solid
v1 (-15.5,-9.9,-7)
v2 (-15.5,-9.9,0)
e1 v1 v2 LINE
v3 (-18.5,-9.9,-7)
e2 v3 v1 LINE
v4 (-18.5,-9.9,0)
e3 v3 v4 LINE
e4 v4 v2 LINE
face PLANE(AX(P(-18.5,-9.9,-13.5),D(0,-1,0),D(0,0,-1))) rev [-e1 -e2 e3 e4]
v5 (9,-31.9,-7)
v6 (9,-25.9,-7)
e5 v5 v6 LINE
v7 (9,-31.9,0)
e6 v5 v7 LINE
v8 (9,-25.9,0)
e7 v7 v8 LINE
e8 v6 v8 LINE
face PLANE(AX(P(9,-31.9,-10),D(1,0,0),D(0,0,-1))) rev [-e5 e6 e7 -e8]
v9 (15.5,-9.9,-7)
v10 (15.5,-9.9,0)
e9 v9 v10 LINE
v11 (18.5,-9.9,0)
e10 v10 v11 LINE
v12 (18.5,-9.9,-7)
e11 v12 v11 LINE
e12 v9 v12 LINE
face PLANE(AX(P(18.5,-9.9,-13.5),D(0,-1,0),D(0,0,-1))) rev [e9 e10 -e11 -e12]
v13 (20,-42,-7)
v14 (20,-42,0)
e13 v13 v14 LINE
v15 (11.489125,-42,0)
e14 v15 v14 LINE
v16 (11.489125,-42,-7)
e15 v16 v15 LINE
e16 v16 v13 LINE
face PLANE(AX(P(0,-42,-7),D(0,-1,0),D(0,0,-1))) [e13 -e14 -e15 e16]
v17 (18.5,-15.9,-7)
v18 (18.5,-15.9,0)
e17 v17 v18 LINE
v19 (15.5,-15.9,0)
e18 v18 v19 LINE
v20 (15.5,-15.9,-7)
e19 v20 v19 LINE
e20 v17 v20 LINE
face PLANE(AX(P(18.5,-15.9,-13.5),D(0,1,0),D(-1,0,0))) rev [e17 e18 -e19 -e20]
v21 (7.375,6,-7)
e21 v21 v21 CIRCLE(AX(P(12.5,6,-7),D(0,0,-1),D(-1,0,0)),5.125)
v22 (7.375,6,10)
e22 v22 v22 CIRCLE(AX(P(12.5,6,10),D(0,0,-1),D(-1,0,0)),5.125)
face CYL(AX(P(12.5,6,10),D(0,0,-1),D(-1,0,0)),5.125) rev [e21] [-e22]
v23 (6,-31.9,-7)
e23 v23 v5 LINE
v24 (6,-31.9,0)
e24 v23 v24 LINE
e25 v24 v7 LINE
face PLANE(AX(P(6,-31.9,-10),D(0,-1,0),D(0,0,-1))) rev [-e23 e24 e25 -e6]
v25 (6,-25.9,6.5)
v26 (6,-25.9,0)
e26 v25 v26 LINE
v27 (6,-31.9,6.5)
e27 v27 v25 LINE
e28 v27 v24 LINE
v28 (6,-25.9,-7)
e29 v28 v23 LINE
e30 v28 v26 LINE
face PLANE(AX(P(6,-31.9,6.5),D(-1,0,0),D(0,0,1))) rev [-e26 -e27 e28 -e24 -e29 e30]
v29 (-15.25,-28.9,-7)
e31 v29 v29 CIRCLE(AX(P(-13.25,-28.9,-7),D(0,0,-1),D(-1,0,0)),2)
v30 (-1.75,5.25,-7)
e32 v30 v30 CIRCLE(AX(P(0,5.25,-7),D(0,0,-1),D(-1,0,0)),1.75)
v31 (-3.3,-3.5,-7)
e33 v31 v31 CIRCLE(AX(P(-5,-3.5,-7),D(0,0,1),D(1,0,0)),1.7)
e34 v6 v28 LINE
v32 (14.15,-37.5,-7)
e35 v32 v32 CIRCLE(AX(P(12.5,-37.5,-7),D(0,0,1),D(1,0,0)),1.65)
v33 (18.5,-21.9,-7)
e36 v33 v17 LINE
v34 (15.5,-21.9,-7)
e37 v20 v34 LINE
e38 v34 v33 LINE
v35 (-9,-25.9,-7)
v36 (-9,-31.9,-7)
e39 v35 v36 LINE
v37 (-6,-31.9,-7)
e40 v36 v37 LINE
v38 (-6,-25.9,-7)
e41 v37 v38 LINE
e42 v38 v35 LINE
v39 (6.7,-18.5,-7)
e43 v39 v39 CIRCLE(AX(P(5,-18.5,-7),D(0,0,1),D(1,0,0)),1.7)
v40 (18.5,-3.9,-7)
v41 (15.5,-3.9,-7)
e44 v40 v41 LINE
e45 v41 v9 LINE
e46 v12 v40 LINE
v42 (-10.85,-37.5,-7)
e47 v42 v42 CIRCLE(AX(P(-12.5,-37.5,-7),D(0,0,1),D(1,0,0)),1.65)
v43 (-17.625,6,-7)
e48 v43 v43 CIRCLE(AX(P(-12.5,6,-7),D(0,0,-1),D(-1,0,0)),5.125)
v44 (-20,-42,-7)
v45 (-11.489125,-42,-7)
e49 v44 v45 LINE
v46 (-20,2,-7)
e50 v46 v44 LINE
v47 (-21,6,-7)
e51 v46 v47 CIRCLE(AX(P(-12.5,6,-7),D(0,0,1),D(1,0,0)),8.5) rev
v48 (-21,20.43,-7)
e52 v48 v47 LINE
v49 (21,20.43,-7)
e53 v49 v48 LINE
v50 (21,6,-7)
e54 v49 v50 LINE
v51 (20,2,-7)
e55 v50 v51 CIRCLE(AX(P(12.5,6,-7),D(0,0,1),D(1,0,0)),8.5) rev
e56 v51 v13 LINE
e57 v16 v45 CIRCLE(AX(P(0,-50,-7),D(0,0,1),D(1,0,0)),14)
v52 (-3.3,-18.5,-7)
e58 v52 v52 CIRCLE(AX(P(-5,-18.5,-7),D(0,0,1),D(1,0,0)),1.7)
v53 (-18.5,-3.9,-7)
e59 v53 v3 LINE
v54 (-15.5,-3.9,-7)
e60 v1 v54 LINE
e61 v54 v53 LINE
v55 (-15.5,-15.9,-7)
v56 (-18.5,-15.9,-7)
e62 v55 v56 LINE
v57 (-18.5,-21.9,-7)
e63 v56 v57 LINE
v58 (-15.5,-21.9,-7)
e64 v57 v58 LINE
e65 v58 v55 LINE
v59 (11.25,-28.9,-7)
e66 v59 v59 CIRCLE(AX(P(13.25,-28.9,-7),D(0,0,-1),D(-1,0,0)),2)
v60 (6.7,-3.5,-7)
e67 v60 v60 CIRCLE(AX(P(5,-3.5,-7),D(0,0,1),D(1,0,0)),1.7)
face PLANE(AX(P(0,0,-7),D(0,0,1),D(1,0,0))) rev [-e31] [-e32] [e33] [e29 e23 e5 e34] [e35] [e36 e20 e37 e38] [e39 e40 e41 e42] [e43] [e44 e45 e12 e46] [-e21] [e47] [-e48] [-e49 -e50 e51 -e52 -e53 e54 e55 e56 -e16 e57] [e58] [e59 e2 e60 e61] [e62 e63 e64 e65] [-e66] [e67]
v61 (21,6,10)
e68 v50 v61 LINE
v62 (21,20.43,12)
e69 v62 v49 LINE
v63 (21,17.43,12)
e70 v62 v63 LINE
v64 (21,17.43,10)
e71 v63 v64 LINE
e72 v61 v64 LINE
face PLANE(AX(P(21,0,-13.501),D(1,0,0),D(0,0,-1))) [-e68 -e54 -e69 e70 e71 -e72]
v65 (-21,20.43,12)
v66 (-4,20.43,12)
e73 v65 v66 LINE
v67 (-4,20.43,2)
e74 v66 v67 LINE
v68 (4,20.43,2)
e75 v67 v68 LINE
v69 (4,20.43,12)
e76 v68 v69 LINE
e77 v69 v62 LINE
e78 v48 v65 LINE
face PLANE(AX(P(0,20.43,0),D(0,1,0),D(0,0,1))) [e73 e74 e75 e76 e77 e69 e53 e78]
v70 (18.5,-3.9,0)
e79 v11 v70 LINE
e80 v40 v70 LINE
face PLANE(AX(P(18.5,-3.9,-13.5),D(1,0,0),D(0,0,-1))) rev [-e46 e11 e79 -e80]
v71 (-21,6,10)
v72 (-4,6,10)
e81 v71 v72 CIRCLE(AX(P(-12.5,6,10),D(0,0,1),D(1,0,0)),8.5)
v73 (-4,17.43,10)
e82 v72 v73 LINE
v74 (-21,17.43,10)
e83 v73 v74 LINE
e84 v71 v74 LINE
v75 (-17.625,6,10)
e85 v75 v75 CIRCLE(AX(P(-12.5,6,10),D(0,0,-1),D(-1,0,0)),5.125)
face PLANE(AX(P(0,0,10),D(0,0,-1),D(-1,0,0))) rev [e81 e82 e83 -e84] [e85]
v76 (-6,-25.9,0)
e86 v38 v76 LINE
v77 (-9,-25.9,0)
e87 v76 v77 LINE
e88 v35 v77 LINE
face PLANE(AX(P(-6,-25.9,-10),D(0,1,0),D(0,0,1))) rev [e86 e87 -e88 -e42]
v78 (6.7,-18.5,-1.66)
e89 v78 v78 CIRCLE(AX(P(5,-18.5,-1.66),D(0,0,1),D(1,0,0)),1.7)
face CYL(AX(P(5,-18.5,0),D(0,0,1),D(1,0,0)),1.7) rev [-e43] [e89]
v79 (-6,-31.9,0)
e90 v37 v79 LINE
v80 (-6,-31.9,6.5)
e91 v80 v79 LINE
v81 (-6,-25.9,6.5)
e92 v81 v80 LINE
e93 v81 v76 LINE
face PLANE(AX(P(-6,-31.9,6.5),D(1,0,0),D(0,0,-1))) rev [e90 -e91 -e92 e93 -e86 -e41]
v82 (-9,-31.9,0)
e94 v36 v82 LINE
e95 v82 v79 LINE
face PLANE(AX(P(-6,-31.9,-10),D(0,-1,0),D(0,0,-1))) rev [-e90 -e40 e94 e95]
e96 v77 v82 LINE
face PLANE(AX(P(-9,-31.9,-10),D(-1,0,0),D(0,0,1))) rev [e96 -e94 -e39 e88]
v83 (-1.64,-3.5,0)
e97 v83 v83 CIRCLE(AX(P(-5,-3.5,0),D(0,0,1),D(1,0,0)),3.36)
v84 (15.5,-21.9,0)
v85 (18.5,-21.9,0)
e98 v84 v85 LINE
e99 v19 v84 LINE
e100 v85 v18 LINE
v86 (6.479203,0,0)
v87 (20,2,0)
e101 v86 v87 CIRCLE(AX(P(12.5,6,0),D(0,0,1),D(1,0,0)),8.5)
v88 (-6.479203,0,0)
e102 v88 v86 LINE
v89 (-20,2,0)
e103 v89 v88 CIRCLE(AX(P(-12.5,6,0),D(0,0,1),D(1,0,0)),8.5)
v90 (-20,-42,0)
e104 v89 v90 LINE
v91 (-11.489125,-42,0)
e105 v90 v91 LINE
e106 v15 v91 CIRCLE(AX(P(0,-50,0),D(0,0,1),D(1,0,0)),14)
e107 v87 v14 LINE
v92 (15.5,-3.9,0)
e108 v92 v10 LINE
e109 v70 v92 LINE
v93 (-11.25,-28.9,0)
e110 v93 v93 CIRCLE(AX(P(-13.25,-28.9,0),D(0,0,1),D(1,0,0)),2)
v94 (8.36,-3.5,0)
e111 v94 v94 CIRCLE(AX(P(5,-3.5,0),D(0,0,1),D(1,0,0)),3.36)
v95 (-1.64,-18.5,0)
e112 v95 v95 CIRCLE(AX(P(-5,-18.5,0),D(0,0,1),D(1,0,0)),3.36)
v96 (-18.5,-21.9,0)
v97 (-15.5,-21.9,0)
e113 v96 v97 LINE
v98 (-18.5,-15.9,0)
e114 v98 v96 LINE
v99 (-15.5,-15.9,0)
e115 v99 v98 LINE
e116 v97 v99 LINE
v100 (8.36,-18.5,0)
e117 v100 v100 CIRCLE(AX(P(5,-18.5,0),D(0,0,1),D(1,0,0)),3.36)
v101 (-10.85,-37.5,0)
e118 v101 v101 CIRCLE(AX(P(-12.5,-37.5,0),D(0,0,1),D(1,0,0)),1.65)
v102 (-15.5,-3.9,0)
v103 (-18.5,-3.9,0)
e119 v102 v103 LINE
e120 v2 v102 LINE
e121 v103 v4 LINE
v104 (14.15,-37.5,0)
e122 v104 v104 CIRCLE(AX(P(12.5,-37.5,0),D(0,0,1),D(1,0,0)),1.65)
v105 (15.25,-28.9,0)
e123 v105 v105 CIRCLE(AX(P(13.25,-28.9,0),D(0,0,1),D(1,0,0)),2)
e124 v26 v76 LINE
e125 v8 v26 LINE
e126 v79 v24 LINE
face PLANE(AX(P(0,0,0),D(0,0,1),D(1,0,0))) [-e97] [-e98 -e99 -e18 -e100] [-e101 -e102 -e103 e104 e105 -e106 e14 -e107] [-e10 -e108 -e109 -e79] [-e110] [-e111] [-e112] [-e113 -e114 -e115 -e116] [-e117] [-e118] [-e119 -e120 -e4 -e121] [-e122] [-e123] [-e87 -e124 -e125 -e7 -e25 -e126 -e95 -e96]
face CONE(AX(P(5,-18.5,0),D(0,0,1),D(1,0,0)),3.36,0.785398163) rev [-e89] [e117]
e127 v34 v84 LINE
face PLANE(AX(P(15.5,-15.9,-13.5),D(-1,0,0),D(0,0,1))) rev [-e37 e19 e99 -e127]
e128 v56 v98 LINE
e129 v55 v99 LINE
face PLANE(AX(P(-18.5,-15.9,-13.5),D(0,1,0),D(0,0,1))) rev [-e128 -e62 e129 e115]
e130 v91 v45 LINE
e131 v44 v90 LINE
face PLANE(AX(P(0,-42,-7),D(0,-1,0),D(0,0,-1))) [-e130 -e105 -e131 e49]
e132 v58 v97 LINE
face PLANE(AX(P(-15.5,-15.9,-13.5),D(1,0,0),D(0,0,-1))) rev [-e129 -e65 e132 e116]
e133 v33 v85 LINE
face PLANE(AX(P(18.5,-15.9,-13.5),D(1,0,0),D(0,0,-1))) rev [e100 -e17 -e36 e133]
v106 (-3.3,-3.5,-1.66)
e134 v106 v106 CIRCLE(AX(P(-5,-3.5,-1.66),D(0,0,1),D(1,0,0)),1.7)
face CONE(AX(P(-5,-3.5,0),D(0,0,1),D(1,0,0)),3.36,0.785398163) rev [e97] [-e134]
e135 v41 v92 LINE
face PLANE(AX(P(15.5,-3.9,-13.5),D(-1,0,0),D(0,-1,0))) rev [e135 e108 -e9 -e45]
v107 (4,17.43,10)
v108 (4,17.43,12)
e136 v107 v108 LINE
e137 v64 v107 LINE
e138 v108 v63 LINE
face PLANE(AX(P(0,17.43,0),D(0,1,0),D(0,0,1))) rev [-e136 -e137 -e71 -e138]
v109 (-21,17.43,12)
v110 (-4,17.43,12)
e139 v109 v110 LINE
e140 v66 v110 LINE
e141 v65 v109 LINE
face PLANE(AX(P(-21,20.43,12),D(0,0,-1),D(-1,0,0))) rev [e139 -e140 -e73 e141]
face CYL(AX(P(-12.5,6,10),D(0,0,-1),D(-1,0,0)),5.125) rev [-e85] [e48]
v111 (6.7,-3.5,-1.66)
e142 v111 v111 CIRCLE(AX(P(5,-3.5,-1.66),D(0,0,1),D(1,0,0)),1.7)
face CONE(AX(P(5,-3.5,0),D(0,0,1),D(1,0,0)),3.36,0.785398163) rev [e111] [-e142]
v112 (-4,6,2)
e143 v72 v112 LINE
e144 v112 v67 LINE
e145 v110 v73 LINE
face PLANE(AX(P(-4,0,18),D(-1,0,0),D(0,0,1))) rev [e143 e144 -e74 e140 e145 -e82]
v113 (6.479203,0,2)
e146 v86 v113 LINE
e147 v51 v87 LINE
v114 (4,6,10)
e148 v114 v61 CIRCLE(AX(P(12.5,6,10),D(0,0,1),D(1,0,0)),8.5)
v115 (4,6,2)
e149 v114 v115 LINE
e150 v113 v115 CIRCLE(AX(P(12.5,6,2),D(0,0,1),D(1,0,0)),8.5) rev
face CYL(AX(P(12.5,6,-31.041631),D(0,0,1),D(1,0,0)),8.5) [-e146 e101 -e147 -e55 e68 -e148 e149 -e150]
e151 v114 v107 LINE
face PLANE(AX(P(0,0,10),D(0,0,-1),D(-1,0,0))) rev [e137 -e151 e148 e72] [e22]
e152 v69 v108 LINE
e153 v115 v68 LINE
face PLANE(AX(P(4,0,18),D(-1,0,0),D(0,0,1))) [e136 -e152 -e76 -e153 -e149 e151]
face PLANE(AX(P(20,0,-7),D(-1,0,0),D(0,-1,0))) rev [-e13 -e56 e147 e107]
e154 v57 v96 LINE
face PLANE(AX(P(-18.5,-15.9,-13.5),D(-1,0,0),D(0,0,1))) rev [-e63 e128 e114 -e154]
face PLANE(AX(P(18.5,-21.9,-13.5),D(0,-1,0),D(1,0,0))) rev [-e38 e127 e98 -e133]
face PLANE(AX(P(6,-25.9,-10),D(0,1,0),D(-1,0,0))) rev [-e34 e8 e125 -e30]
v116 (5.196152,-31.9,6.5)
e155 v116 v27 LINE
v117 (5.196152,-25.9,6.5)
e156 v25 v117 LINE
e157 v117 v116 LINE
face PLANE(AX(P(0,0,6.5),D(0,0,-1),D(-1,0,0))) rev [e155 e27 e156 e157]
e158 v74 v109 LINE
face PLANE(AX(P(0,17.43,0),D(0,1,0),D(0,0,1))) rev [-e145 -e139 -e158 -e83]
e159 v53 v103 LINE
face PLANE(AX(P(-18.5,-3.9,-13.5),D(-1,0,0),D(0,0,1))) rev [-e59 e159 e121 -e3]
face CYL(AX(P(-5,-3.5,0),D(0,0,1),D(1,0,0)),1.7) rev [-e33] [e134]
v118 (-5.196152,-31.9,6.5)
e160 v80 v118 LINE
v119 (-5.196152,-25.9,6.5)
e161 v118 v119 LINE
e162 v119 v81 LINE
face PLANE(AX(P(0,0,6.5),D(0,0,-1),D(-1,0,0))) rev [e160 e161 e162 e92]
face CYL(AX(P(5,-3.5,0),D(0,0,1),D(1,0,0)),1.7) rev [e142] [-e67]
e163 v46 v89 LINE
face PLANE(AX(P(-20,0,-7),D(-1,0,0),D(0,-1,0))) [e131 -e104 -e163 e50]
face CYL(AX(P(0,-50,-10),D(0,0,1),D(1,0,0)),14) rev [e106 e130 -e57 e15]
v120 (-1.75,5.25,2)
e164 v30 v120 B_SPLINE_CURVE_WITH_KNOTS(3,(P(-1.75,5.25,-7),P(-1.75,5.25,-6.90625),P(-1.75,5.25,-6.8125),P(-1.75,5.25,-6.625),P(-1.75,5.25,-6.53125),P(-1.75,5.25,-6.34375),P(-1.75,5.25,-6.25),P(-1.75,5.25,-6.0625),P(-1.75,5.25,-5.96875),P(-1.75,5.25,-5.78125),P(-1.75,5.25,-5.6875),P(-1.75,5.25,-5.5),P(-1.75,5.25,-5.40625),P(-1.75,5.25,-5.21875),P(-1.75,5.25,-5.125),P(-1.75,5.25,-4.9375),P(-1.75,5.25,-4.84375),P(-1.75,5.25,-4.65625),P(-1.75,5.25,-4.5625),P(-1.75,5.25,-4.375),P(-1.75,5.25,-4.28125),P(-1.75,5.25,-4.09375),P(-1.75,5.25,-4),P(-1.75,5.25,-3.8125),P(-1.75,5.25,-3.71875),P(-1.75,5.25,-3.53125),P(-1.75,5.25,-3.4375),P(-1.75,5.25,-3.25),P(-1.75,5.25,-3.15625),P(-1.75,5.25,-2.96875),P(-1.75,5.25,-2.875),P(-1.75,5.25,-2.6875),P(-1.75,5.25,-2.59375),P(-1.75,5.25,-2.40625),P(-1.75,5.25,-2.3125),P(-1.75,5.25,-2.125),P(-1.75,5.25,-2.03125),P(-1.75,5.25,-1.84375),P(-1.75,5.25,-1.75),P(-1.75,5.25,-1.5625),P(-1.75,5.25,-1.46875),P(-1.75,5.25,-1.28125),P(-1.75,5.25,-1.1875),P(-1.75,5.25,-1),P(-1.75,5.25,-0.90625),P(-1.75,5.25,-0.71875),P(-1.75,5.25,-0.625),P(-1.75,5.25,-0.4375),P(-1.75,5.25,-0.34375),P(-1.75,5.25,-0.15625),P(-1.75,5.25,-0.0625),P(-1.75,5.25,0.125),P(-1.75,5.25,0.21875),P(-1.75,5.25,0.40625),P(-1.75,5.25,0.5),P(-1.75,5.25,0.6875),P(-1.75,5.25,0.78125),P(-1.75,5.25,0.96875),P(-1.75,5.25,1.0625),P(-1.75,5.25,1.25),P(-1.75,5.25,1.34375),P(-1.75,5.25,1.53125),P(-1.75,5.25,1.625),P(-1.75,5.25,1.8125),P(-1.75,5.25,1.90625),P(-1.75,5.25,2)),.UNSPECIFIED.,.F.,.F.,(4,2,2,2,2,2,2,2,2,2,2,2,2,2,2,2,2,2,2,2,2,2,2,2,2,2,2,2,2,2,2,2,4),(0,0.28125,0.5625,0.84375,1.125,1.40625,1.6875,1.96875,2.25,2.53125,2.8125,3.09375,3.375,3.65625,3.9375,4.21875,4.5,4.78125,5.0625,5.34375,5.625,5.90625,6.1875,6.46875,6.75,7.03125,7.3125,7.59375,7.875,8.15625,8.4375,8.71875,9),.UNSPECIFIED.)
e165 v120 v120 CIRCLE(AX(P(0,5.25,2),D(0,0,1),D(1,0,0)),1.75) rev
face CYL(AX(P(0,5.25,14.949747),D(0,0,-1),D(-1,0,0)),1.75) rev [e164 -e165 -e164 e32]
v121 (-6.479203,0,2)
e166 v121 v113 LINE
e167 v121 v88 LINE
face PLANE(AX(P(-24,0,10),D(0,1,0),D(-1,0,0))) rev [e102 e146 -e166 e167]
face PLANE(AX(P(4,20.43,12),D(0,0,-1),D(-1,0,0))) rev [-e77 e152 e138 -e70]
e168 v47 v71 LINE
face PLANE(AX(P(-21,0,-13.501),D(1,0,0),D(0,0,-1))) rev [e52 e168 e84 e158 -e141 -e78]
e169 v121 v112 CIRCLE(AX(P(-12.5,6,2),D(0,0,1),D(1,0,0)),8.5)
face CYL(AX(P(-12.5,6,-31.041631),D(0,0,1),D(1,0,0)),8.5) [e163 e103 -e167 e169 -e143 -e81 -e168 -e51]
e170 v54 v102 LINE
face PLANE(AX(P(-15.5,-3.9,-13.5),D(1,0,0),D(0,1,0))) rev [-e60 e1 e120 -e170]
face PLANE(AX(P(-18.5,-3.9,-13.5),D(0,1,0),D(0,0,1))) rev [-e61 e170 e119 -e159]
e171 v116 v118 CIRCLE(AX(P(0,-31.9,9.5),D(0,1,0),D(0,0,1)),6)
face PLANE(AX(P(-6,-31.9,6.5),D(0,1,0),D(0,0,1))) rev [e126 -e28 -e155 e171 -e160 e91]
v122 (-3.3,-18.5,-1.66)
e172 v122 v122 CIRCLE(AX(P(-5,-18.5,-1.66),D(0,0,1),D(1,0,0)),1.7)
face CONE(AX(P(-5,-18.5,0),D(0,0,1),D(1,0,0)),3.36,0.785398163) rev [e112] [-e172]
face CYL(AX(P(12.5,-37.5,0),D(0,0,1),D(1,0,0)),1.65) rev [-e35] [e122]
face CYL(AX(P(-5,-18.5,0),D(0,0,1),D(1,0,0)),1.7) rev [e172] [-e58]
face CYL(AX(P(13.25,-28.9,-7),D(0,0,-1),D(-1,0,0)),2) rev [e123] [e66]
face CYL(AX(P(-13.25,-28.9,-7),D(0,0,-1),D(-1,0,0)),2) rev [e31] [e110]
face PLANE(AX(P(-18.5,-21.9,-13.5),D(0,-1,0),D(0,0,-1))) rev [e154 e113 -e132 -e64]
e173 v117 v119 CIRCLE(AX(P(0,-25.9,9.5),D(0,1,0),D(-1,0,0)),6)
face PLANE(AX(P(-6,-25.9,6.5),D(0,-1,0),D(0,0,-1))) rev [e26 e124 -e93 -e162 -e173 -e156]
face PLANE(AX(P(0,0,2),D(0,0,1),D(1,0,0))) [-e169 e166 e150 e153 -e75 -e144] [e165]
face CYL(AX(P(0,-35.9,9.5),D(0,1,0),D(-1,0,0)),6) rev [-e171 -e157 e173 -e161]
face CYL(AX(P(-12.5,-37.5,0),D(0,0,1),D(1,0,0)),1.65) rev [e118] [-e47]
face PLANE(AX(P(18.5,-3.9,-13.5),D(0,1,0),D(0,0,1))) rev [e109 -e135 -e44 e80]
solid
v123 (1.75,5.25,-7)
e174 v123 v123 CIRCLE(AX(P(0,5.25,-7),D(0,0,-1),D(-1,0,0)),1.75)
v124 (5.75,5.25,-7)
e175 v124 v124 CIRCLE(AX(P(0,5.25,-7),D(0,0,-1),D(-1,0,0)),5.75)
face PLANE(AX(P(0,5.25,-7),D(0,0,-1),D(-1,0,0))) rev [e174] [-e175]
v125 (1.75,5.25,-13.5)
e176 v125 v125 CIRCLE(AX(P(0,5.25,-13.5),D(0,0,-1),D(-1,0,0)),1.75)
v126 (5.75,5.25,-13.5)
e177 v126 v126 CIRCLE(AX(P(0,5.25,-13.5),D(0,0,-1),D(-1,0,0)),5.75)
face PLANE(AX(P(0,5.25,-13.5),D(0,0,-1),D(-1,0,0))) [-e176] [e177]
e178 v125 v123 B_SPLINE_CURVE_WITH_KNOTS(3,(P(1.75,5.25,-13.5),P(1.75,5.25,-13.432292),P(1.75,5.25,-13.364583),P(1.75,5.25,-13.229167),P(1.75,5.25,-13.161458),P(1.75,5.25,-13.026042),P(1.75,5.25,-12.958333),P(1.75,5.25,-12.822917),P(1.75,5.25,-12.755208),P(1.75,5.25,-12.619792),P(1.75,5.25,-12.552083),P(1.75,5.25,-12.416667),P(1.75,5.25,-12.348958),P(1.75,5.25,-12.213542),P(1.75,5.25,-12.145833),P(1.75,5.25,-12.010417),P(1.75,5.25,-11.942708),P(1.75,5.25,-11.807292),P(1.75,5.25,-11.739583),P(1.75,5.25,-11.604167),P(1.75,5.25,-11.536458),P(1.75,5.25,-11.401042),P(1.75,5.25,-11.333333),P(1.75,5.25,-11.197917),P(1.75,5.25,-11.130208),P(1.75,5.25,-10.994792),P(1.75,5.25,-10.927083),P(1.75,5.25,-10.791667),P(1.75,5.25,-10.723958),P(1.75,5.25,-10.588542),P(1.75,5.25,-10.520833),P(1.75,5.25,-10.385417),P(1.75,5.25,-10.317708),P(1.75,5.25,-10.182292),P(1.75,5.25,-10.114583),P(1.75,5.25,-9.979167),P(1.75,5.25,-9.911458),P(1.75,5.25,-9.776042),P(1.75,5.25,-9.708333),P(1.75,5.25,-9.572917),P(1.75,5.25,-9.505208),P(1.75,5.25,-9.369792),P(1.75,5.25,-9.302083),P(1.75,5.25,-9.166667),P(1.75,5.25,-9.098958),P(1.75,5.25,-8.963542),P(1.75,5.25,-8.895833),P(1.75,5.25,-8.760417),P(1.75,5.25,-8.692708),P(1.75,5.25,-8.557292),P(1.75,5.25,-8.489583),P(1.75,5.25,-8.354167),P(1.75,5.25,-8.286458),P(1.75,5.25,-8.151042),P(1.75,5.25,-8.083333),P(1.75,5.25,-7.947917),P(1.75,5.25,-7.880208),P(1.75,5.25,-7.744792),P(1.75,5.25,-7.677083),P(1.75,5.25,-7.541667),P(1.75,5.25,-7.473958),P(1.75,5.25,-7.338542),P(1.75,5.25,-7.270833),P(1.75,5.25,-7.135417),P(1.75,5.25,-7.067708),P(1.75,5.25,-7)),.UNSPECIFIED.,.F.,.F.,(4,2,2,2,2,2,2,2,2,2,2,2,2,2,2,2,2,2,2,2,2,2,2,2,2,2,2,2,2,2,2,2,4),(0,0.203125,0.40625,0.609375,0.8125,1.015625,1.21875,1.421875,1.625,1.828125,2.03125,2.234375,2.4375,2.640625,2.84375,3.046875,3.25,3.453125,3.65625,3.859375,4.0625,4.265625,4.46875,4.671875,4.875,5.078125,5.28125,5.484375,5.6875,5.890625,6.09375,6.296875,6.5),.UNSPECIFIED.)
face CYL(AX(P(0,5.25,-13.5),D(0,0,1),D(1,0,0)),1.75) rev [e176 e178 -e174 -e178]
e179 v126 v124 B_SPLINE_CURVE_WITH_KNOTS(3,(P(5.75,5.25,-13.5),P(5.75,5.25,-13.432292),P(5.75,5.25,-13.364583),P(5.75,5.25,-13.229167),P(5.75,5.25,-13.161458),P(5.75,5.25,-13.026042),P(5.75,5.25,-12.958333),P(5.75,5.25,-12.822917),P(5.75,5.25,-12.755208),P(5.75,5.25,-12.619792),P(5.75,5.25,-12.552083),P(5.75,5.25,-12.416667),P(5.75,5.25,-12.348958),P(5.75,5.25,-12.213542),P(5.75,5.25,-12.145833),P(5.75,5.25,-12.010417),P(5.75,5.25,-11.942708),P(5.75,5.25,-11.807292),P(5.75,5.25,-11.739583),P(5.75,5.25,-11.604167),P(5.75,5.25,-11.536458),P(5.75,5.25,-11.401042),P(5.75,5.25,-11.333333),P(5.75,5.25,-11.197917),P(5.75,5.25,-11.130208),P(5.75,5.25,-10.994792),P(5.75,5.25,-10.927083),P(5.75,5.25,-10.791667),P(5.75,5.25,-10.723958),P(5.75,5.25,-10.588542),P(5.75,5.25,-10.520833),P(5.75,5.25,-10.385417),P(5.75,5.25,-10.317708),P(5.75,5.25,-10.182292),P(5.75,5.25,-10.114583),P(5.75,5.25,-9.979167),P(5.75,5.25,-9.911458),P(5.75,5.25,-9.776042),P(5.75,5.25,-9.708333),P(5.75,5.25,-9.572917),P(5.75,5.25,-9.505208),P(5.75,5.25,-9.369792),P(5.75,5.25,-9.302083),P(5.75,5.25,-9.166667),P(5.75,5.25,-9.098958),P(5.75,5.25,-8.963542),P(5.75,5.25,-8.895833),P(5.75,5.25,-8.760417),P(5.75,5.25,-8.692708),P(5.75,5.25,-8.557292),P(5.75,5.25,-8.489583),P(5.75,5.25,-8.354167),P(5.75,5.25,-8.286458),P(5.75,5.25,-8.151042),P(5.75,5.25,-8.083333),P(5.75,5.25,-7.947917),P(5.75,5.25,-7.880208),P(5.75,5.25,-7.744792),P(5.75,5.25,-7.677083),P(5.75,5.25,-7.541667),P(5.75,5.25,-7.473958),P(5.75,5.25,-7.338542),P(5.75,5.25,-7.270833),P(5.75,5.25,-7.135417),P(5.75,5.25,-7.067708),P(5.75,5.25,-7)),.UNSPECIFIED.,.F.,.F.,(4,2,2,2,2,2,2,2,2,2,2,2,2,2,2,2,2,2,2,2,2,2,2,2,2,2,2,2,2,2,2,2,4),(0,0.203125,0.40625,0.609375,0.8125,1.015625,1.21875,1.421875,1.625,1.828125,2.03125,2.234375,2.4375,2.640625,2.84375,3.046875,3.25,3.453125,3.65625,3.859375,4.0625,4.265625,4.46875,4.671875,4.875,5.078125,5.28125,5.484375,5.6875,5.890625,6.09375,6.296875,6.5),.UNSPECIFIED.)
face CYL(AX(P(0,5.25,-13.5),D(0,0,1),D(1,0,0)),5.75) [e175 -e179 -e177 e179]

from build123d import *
from build123d.topology import SkipClean

# Parameters (mm, degrees)
SKETCH1_W                         = 30
SKETCH1_H                         = 42
BOSS_EXTRUDE1_DEPTH               = 7
CSK_FOR_M3_SFHCS1_D               = 3.4
CSK_FOR_M3_SFHCS1_CSINK_D         = 6.72
CSK_FOR_M3_SFHCS1_CSINK_ANGLE     = 90
SKETCH4_R                         = 14
CUT_EXTRUDE1_DEPTH                = 10
M4X0_7_TAPPED_HOLE1_D             = 3.3
SKETCH8_W                         = 12
SKETCH8_H                         = 6
BOSS_EXTRUDE2_DEPTH               = 6.5
SKETCH9_R                         = 6
CUT_EXTRUDE2_DEPTH                = 10
SKETCH13_W                        = 3
SKETCH13_H                        = 6
CUT_EXTRUDE4_DEPTH                = 10
BOSS_EXTRUDE5_DEPTH               = 10
BOSS_EXTRUDE5_DEPTH_BACK          = 7
SKETCH14_W                        = 48
SKETCH14_H                        = 17
SKETCH15_R                        = 5.125
CUT_EXTRUDE5_DEPTH                = 52.273774973
BOSS_EXTRUDE6_REACH               = 53.274
SKETCH16_R                        = 8.5
SKETCH16_R_2                      = 5.125
SKETCH18_R                        = 5.75
SKETCH18_R_2                      = 1.75
BOSS_EXTRUDE7_DEPTH               = 6.5
SKETCH19_R                        = 1.75
CUT_EXTRUDE6_DEPTH                = 17
SKETCH20_W                        = 32
SKETCH20_H                        = 3
BOSS_EXTRUDE8_DEPTH               = 3
CUT_EXTRUDE7_DEPTH                = 8
CUT_EXTRUDE7_DEPTH_BACK           = 8
SKETCH22_R                        = 1.75
SKETCH22_W                        = 8
SKETCH22_H                        = 3
SKETCH24_W                        = 2
SKETCH24_H                        = 7.001
F_4_0_4_DIAMETER_HOLE1_AT_2_COUNT = 2
F_4_0_4_DIAMETER_HOLE1_AT_2_PITCH = 26.5
CUT_EXTRUDE8_DEPTH                = 17
MOVE_FACE2_BY                     = 0.43
SKETCH26_W                        = 32
SKETCH26_H                        = 3.43
CUT_EXTRUDE9_DEPTH                = 3
BOSS_EXTRUDE9_DEPTH               = 3
DELETEFACE1_START                 = -7
DELETEFACE1_DEPTH                 = 7
SKETCH28_W                        = 3
SKETCH28_H                        = 6
CUT_EXTRUDE10_DEPTH               = 49.859492425


# Read off the part's stored shape, not the designer's step: DeleteFace1
with BuildPart() as part:
    # Sketch1 → Boss-Extrude1 (new body)
    with BuildSketch(Plane.XY):
        with Locations((0, -21)):
            Rectangle(SKETCH1_W, SKETCH1_H)
        Polygon((-15, -42), (-15, -2), (-20, -7), (-20, -42), align=None)
        Polygon((15, -2), (15, -42), (20, -42), (20, -7), align=None)
    extrude(amount=-BOSS_EXTRUDE1_DEPTH)

    # CSK for M3 SFHCS1 (through all)
    with Locations(Plane.XY):
        with Locations((-5, -3.5), (5, -3.5), (-5, -18.5), (5, -18.5)):
            CounterSinkHole(CSK_FOR_M3_SFHCS1_D / 2, CSK_FOR_M3_SFHCS1_CSINK_D / 2, counter_sink_angle=CSK_FOR_M3_SFHCS1_CSINK_ANGLE)

    # Sketch4 → Cut-Extrude1 (cut)
    with BuildSketch(Plane.XY):
        with Locations((0, -50)):
            Circle(SKETCH4_R)
    extrude(amount=-CUT_EXTRUDE1_DEPTH, mode=Mode.SUBTRACT)

    # M4x0.7 Tapped Hole1 (through all)
    with Locations(Plane.XY):
        with Locations((-12.5, -37.5), (12.5, -37.5)):
            Hole(M4X0_7_TAPPED_HOLE1_D / 2)

    # Sketch8 → Boss-Extrude2 (add)
    with BuildSketch(Plane.XY):
        with Locations((0, -28.9)):
            Rectangle(SKETCH8_W, SKETCH8_H)
    extrude(amount=BOSS_EXTRUDE2_DEPTH)

    # Sketch9 → Cut-Extrude2 (cut)
    with BuildSketch(Plane(origin=(0, -25.9, 0), x_dir=(1, 0, 0), z_dir=(0, 1, 0))):
        with Locations((0, -9.5)):
            Circle(SKETCH9_R)
    extrude(amount=-CUT_EXTRUDE2_DEPTH, mode=Mode.SUBTRACT)

    # Sketch13 → Cut-Extrude4 (cut)
    with BuildSketch(Plane.XY):
        with Locations((-7.5, -28.9)):
            Rectangle(SKETCH13_W, SKETCH13_H)
        with Locations((7.5, -28.9)):
            Rectangle(SKETCH13_W, SKETCH13_H)
    extrude(amount=-CUT_EXTRUDE4_DEPTH, mode=Mode.SUBTRACT)

    # Sketch14 → Boss-Extrude5 (add, two sides: drawn at the far end of the back side and taken through both)
    with BuildSketch(Plane.XY.offset(-BOSS_EXTRUDE5_DEPTH_BACK)):
        with Locations((0, 8.5)):
            Rectangle(SKETCH14_W, SKETCH14_H)
    extrude(amount=BOSS_EXTRUDE5_DEPTH + BOSS_EXTRUDE5_DEPTH_BACK)

    # Sketch15 → Cut-Extrude5 (cut, through all)
    with BuildSketch(Plane(origin=(0, 0, -7), x_dir=(-1, 0, 0), z_dir=(0, 0, -1))):
        with Locations((12.5, 6)):
            Circle(SKETCH15_R)
        with Locations((-12.5, 6)):
            Circle(SKETCH15_R)
    extrude(amount=-CUT_EXTRUDE5_DEPTH, mode=Mode.SUBTRACT)

    # Boss-Extrude6: up to this face of the body (flat: up to its plane)
    boss_extrude6_end = Plane(part.part.faces().sort_by_distance((0, -11.103380249, -7))[0])
    # Sketch16 → Boss-Extrude6 (add, up to the picked face)
    with BuildSketch(Plane.XY.offset(10), mode=Mode.PRIVATE) as boss_extrude6_sk1:
        with Locations((-12.5, 6)):
            Circle(SKETCH16_R)
        with Locations(Location((-12.5, 6, 0), (0, 0, 180))):
            Circle(SKETCH16_R_2, mode=Mode.SUBTRACT)
    boss_extrude6_tool1 = split(extrude(boss_extrude6_sk1.sketch, amount=-BOSS_EXTRUDE6_REACH, mode=Mode.PRIVATE), bisect_by=boss_extrude6_end, keep=Keep.BOTH, mode=Mode.PRIVATE)
    # Sketch16 → Boss-Extrude6 (add, up to the picked face)
    with BuildSketch(Plane.XY.offset(10), mode=Mode.PRIVATE) as boss_extrude6_sk2:
        with Locations((12.5, 6)):
            Circle(SKETCH16_R)
        with Locations(Location((12.5, 6, 0), (0, 0, 180))):
            Circle(SKETCH16_R_2, mode=Mode.SUBTRACT)
    boss_extrude6_tool2 = split(extrude(boss_extrude6_sk2.sketch, amount=-BOSS_EXTRUDE6_REACH, mode=Mode.PRIVATE), bisect_by=boss_extrude6_end, keep=Keep.BOTH, mode=Mode.PRIVATE)
    add(boss_extrude6_tool1.solids().sort_by(Axis((-20.759584, 6, 10), (0, 0, -1)))[0])
    add(boss_extrude6_tool2.solids().sort_by(Axis((4.240416, 6, 10), (0, 0, -1)))[0])

    # Sketch19 → Cut-Extrude6 (cut)
    with BuildSketch(Plane(origin=(0, 0, -7), x_dir=(-1, 0, 0), z_dir=(0, 0, -1))):
        with Locations(Location((0, 5.25, 0), (0, 0, 180))):
            Circle(SKETCH19_R)
    extrude(amount=-CUT_EXTRUDE6_DEPTH, mode=Mode.SUBTRACT)

    # Sketch20 → Boss-Extrude8 (add)
    with BuildSketch(Plane.XY.offset(10)):
        with Locations((0, 15.5)):
            Rectangle(SKETCH20_W, SKETCH20_H)
    extrude(amount=BOSS_EXTRUDE8_DEPTH)

    # Sketch22 → Cut-Extrude7 (cut, two sides: drawn at the far end of the back side and taken through both)
    # profile 1 of 4: a face of its own
    with SkipClean():  # the faces are left unmerged after this step: merging them gives an invalid solid
        with BuildSketch(Plane.XY.offset(10).offset(-CUT_EXTRUDE7_DEPTH_BACK)):
            Polygon((-4, 6), (-4, 0), (4, 0), (4, 6), (4, 14), (-4, 14), align=None)
            with Locations((0, 5.25)):
                Circle(SKETCH22_R, mode=Mode.SUBTRACT)
        # profile 2 of 4: a face of its own
        with BuildSketch(Plane.XY.offset(10).offset(-CUT_EXTRUDE7_DEPTH_BACK)):
            with BuildLine():
                Line((-6.479202711, 0), (-4, 0))
                Line((-4, 0), (-4, 6))
                ThreePointArc((-4, 6), (-4.644213058, 2.753985287), (-6.479202711, 0))
            make_face()
        # profile 3 of 4: a face of its own
        with BuildSketch(Plane.XY.offset(10).offset(-CUT_EXTRUDE7_DEPTH_BACK)):
            with BuildLine():
                Line((4, 6), (4, 0))
                Line((4, 0), (6.479202711, 0))
                ThreePointArc((6.479202711, 0), (4.644213058, 2.753985287), (4, 6))
            make_face()
        # profile 4 of 4: a face of its own
        with BuildSketch(Plane.XY.offset(10).offset(-CUT_EXTRUDE7_DEPTH_BACK)):
            with Locations((0, 15.5)):
                Rectangle(SKETCH22_W, SKETCH22_H)
        extrude(amount=CUT_EXTRUDE7_DEPTH + CUT_EXTRUDE7_DEPTH_BACK, mode=Mode.SUBTRACT)

    # Sketch24 → Ø4.0 (4) Diameter Hole1 (revolve, cut)
    with SkipClean():  # the faces are left unmerged after this step: merging them gives an invalid solid
        with BuildSketch(Plane(origin=(13.25, -28.9, -7), x_dir=(0, 1, 0), z_dir=(1, 0, 0))):
            with Locations((1, 3.5005)):
                Rectangle(SKETCH24_W, SKETCH24_H)
        f_4_0_4_diameter_hole1 = revolve(axis=Axis((13.25, -28.9, -13.35), (0, 0, 1)), mode=Mode.SUBTRACT)

    # Ø4.0 (4) Diameter Hole1 at 2: Ø4.0 (4) Diameter Hole1 ×2
    with SkipClean():  # the faces are left unmerged after this step: merging them gives an invalid solid
        with Locations(*[(-i * F_4_0_4_DIAMETER_HOLE1_AT_2_PITCH, 0, 0) for i in range(1, F_4_0_4_DIAMETER_HOLE1_AT_2_COUNT)]):
            add(f_4_0_4_diameter_hole1, mode=Mode.SUBTRACT)

    # Sketch25 → Cut-Extrude8 (cut)
    with SkipClean():  # the faces are left unmerged after this step: merging them gives an invalid solid
        with BuildSketch(Plane.XY.offset(10)):
            with BuildLine():
                ThreePointArc((-18.520797289, 0), (-20.355786942, 2.753985287), (-21, 6))
                Line((-21, 6), (-21, 17))
                Line((-21, 17), (-24, 17))
                Line((-24, 17), (-24, 0))
                Line((-24, 0), (-18.520797289, 0))
            make_face()
            with BuildLine():
                ThreePointArc((21, 6), (20.355786942, 2.753985287), (18.520797289, 0))
                Line((18.520797289, 0), (24, 0))
                Line((24, 0), (24, 17))
                Line((24, 17), (21, 17))
                Line((21, 17), (21, 6))
            make_face()
        extrude(amount=-CUT_EXTRUDE8_DEPTH, mode=Mode.SUBTRACT)

    # Move Face2: a face moved outward by 0.43
    extrude(part.faces().sort_by_distance((0, 17, -2))[0], amount=MOVE_FACE2_BY, dir=(0, 1, 0))

    # Sketch26 → Cut-Extrude9 (cut)
    with SkipClean():  # the faces are left unmerged after this step: merging them gives an invalid solid
        with BuildSketch(Plane.XY.offset(13)):
            with Locations((0, 15.715)):
                Rectangle(SKETCH26_W, SKETCH26_H)
        extrude(amount=-CUT_EXTRUDE9_DEPTH, mode=Mode.SUBTRACT)

    # Sketch27 → Boss-Extrude9 (add)
    with SkipClean():  # the faces are left unmerged after this step: merging them gives an invalid solid
        with BuildSketch(Plane(origin=(0, 17.43, 0), x_dir=(1, 0, 0), z_dir=(0, 1, 0))):
            Polygon((-21, -10), (-21, -12), (-4, -12), (-4, -10), (-4, -2), (4, -2), (4, -10), (4, -12), (21, -12), (21, -10), (21, 7), (-21, 7), align=None)
        extrude(amount=BOSS_EXTRUDE9_DEPTH)

    # DeleteFace1 outline → DeleteFace1 (add)
    with SkipClean():  # the faces are left unmerged after this step: merging them gives an invalid solid
        with BuildSketch(Plane.XY.offset(DELETEFACE1_START)):
            with BuildLine():
                ThreePointArc((-15.094389582, -2.094389582), (-17.946575233, -0.525704424), (-20, 2))
                Line((-20, 2), (-20, -7))
                Line((-20, -7), (-15.094389582, -2.094389582))
            make_face()
            with BuildLine():
                Line((20, -7), (20, 2))
                ThreePointArc((20, 2), (17.946575233, -0.525704424), (15.094389582, -2.094389582))
                Line((15.094389582, -2.094389582), (20, -7))
            make_face()
        extrude(amount=DELETEFACE1_DEPTH)

    # Sketch28 → Cut-Extrude10 (cut, through all)
    with SkipClean():  # the faces are left unmerged after this step: merging them gives an invalid solid
        with BuildSketch(Plane.XY):
            with Locations((17, -18.9)):
                Rectangle(SKETCH28_W, SKETCH28_H)
            with Locations((17, -6.9)):
                Rectangle(SKETCH28_W, SKETCH28_H)
            with Locations((-17, -6.9)):
                Rectangle(SKETCH28_W, SKETCH28_H)
            with Locations((-17, -18.9)):
                Rectangle(SKETCH28_W, SKETCH28_H)
        extrude(amount=-CUT_EXTRUDE10_DEPTH, mode=Mode.SUBTRACT)


with BuildPart() as body_2:
    # Sketch18 → Boss-Extrude7 (new body)
    with BuildSketch(Plane(origin=(0, 0, -7), x_dir=(-1, 0, 0), z_dir=(0, 0, -1))):
        with Locations(Location((0, 5.25, 0), (0, 0, 180))):
            Circle(SKETCH18_R)
        with Locations(Location((0, 5.25, 0), (0, 0, 180))):
            Circle(SKETCH18_R_2, mode=Mode.SUBTRACT)
    extrude(amount=BOSS_EXTRUDE7_DEPTH)


solid = Compound([part.part, body_2.part])
